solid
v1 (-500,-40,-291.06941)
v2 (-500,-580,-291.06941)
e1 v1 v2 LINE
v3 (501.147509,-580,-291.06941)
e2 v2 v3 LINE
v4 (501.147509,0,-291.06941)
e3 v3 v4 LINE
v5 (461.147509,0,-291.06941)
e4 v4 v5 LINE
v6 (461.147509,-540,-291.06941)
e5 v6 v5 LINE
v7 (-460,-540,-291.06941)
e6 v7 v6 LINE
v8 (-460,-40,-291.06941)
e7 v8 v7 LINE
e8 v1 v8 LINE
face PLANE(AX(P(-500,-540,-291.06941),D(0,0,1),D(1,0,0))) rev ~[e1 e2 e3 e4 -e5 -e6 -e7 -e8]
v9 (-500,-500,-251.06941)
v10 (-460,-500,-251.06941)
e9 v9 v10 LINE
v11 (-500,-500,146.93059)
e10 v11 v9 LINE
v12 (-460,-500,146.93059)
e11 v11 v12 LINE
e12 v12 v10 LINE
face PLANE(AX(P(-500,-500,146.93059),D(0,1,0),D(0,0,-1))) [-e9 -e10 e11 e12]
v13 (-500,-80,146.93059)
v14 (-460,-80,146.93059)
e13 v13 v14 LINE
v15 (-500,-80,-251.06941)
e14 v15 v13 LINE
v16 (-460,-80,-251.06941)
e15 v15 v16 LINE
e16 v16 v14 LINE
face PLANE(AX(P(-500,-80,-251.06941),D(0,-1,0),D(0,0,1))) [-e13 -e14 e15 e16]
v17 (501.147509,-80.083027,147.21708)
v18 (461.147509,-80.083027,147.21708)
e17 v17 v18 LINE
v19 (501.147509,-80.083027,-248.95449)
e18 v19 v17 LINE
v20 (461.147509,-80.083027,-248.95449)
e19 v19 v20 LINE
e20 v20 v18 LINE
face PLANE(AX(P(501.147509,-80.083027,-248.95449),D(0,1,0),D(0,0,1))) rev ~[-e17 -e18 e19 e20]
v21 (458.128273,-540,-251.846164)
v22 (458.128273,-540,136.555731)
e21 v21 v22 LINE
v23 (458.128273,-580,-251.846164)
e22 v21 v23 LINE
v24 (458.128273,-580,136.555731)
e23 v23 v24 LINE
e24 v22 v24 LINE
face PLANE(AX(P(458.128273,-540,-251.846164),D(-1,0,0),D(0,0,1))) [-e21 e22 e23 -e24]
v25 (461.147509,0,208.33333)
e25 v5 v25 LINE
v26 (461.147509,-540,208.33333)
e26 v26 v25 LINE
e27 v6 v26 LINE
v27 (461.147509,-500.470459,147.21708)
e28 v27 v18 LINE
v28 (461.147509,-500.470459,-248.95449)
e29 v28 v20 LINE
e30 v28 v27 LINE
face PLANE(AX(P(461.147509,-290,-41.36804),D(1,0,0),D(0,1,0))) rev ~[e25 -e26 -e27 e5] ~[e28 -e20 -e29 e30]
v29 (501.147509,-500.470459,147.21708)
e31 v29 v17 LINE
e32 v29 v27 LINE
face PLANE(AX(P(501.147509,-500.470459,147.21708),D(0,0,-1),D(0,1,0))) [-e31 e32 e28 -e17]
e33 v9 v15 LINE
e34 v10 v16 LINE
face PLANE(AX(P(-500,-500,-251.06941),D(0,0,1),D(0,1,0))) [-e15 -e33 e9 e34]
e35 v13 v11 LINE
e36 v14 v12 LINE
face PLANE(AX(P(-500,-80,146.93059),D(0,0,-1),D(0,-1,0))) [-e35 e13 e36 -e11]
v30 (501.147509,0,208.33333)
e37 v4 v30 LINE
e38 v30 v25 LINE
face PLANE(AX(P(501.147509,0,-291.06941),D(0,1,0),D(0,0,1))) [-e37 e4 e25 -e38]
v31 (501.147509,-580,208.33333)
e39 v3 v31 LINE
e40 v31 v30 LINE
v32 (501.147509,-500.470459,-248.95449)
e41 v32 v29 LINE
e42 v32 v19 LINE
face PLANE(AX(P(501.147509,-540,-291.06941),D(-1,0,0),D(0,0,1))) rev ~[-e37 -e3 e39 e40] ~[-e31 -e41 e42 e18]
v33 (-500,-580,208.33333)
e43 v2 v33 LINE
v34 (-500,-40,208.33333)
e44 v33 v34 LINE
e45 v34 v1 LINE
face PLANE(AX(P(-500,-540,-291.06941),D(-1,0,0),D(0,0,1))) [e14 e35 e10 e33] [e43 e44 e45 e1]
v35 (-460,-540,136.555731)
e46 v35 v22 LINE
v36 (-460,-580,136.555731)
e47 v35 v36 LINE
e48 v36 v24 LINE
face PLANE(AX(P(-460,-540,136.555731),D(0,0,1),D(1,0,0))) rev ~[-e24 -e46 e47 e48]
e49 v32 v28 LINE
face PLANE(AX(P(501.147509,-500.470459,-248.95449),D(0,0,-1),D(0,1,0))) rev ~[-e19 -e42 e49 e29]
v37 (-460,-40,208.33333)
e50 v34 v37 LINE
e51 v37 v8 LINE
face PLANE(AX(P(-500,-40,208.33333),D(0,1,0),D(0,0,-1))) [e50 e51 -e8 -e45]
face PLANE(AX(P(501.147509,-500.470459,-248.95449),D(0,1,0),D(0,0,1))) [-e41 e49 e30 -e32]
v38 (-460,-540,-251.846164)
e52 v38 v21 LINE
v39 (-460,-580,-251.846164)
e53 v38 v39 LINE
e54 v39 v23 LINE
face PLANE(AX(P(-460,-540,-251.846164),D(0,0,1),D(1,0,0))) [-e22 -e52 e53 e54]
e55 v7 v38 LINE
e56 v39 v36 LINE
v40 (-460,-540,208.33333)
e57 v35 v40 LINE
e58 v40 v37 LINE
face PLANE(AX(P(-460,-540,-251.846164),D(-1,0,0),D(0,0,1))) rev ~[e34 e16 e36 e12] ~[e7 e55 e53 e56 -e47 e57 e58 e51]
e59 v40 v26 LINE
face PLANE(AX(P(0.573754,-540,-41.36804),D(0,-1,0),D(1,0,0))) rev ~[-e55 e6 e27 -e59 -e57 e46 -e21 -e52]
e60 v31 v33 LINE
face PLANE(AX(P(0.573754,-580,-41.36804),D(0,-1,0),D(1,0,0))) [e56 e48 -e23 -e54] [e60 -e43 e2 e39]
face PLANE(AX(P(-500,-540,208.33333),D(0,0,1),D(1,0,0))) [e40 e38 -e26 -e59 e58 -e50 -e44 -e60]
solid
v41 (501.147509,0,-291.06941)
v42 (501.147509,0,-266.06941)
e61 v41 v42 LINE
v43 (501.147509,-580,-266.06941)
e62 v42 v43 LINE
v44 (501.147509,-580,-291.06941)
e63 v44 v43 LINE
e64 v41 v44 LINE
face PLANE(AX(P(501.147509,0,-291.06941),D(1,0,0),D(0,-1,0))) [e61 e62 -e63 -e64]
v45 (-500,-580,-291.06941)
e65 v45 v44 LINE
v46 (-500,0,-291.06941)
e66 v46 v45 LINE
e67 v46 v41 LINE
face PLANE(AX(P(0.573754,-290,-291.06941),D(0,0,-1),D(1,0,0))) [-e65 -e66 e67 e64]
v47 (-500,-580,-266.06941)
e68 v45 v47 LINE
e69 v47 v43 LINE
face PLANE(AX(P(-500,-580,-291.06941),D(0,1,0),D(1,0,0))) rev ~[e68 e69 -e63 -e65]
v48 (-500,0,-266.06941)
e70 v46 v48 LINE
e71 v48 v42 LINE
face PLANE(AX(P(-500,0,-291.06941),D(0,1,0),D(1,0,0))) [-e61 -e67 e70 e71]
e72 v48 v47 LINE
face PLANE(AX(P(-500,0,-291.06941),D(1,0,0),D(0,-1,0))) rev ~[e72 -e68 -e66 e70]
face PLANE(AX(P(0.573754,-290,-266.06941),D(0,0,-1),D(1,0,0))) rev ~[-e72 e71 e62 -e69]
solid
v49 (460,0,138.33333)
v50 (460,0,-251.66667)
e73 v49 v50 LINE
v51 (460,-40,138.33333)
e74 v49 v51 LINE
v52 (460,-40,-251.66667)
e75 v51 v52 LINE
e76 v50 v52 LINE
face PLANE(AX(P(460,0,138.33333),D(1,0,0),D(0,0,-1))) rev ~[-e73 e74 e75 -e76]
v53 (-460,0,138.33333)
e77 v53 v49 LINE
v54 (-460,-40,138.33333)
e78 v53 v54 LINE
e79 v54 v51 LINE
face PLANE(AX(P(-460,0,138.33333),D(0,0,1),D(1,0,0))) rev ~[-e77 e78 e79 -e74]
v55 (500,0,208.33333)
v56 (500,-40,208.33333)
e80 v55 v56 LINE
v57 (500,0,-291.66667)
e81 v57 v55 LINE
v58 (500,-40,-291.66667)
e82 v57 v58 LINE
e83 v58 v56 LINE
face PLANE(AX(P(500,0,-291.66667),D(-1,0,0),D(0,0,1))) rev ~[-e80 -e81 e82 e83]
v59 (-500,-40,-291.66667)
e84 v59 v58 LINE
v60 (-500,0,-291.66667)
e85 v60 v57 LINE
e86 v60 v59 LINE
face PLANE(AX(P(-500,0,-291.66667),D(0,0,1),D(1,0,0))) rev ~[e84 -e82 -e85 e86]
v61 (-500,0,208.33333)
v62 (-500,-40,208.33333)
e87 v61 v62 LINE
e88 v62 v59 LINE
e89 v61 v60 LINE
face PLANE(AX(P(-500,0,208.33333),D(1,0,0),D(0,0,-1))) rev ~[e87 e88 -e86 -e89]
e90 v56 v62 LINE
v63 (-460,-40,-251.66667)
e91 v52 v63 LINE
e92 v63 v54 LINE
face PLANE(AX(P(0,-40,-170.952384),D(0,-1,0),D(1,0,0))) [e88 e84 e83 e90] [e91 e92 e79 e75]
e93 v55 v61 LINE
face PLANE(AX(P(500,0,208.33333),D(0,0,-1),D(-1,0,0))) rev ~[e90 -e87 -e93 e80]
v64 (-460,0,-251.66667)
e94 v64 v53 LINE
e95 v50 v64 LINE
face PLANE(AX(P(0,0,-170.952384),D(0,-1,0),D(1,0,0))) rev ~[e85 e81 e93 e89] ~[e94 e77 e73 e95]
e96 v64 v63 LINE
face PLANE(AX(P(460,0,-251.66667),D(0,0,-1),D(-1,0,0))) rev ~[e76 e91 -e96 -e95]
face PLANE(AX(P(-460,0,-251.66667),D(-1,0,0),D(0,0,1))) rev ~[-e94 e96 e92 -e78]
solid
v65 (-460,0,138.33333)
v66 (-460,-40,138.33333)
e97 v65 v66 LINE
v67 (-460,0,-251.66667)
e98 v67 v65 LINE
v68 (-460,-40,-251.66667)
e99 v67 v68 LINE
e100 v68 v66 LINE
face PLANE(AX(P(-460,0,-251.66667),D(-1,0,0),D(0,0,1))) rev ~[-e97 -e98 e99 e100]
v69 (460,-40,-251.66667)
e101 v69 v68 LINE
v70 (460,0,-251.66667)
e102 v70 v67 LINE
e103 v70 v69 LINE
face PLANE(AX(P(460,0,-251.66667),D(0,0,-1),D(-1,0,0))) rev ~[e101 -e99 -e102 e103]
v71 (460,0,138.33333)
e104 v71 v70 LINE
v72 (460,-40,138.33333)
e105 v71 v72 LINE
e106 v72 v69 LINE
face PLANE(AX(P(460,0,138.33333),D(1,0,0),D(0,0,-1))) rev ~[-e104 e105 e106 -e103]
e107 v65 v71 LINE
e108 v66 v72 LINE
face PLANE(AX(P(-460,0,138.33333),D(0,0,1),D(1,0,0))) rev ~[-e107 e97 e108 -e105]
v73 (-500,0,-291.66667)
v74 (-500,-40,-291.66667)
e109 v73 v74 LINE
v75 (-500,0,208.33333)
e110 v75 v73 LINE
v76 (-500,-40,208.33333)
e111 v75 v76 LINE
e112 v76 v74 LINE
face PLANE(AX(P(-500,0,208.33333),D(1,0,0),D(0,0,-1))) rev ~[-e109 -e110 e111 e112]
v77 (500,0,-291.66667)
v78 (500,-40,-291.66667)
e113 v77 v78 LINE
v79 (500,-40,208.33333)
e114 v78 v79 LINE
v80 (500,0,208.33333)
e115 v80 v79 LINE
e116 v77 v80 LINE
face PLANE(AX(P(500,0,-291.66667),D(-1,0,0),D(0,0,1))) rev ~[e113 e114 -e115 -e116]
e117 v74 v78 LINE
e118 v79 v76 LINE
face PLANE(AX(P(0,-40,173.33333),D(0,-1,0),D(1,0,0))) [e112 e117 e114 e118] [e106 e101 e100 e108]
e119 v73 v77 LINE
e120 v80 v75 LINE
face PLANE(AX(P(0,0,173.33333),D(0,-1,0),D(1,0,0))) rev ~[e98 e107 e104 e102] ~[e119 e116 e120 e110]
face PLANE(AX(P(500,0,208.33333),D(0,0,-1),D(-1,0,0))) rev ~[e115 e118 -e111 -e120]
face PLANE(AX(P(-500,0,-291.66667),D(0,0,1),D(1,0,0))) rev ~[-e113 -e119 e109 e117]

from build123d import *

# Parameters (mm, degrees)
F1_DEPTH  = 40
F2_DEPTH  = 40
F4_DEPTH  = 40
F5_W      = 1001.1475086212
F5_H      = 499.4027398658
F5_W_2    = 918.1282734871
F5_H_2    = 388.4018957615
F6_DEPTH  = 40
F7_W      = 580
F7_H      = 499.4027398658
F7_W_2    = 420.3874319792
F7_H_2    = 396.1715698242
F8_DEPTH  = 40
F9_W      = 1001.1475086212
F9_H      = 580
F10_DEPTH = 25


# Not quite as in the source:
# - a feature names something its author has since deleted; it is built from what else it names


with BuildPart() as f1:
    # F0 (on Front) → F1 (new body)
    with BuildSketch(Plane.XZ):
        Polygon((-500, 208.3333301377), (-500, 138.3333301377), (-460, 138.3333301377), (460, 138.3333301377), (500, 138.3333301377), (500, 208.3333301377), align=None)
        Polygon((-500, 138.3333301377), (-500, -291.6666698623), (500, -291.6666698623), (500, 138.3333301377), (460, 138.3333301377), (460, -251.6666698623), (-460, -251.6666698623), (-460, 138.3333301377), align=None)
    extrude(amount=F1_DEPTH)


with BuildPart() as f2:
    # F0 (on Front) → F2 (new body)
    with BuildSketch(Plane.XZ):
        Polygon((-500, 138.3333301377), (-500, -291.6666698623), (500, -291.6666698623), (500, 138.3333301377), (460, 138.3333301377), (460, -251.6666698623), (-460, -251.6666698623), (-460, 138.3333301377), align=None)
        Polygon((-500, 208.3333301377), (-500, 138.3333301377), (-460, 138.3333301377), (460, 138.3333301377), (500, 138.3333301377), (500, 208.3333301377), align=None)
    extrude(amount=F2_DEPTH)


with BuildPart() as f4:
    # F3 (on face) → F4 (new body)
    with BuildSketch(Plane(origin=(-500, 0, 0), x_dir=(0, -1, 0), z_dir=(-1, 0, 0))):
        Polygon((40, 208.3333301377), (40, 146.9305902719), (80, 146.9305902719), (500, 146.9305902719), (540, 146.9305902719), (540, 208.3333301377), align=None)
        Polygon((80, 146.9305902719), (40, 146.9305902719), (40, -291.0694097281), (540, -291.0694097281), (540, 146.9305902719), (500, 146.9305902719), (500, -251.0694097281), (80, -251.0694097281), align=None)
    extrude(amount=-F4_DEPTH)

    # F5 (on face) → F6 (join)
    with BuildSketch(Plane.XZ.offset(540)):
        with Locations((0.5737543106, -41.3680397952)):
            Rectangle(F5_W, F5_H)
        with Locations((-0.9358632565, -57.6452165842)):
            Rectangle(F5_W_2, F5_H_2, mode=Mode.SUBTRACT)
    extrude(amount=F6_DEPTH)

    # F7 (on face) → F8 (join)
    with BuildSketch(Plane.YZ.offset(501.1475086212)):
        with Locations((-290, -41.3680397952)):
            Rectangle(F7_W, F7_H)
        with Locations((-290.2767434716, -50.868704915)):
            Rectangle(F7_W_2, F7_H_2, mode=Mode.SUBTRACT)
    extrude(amount=-F8_DEPTH)


with BuildPart() as f10:
    # F9 (on face) → F10 (new body)
    with BuildSketch(Plane(origin=(0, 0, -291.0694097281), x_dir=(1, 0, 0), z_dir=(0, 0, -1))):
        with Locations((0.5737543106, 290)):
            Rectangle(F9_W, F9_H)
    extrude(amount=-F10_DEPTH)


solid = Compound([f1.part, f2.part, f4.part, f10.part])
